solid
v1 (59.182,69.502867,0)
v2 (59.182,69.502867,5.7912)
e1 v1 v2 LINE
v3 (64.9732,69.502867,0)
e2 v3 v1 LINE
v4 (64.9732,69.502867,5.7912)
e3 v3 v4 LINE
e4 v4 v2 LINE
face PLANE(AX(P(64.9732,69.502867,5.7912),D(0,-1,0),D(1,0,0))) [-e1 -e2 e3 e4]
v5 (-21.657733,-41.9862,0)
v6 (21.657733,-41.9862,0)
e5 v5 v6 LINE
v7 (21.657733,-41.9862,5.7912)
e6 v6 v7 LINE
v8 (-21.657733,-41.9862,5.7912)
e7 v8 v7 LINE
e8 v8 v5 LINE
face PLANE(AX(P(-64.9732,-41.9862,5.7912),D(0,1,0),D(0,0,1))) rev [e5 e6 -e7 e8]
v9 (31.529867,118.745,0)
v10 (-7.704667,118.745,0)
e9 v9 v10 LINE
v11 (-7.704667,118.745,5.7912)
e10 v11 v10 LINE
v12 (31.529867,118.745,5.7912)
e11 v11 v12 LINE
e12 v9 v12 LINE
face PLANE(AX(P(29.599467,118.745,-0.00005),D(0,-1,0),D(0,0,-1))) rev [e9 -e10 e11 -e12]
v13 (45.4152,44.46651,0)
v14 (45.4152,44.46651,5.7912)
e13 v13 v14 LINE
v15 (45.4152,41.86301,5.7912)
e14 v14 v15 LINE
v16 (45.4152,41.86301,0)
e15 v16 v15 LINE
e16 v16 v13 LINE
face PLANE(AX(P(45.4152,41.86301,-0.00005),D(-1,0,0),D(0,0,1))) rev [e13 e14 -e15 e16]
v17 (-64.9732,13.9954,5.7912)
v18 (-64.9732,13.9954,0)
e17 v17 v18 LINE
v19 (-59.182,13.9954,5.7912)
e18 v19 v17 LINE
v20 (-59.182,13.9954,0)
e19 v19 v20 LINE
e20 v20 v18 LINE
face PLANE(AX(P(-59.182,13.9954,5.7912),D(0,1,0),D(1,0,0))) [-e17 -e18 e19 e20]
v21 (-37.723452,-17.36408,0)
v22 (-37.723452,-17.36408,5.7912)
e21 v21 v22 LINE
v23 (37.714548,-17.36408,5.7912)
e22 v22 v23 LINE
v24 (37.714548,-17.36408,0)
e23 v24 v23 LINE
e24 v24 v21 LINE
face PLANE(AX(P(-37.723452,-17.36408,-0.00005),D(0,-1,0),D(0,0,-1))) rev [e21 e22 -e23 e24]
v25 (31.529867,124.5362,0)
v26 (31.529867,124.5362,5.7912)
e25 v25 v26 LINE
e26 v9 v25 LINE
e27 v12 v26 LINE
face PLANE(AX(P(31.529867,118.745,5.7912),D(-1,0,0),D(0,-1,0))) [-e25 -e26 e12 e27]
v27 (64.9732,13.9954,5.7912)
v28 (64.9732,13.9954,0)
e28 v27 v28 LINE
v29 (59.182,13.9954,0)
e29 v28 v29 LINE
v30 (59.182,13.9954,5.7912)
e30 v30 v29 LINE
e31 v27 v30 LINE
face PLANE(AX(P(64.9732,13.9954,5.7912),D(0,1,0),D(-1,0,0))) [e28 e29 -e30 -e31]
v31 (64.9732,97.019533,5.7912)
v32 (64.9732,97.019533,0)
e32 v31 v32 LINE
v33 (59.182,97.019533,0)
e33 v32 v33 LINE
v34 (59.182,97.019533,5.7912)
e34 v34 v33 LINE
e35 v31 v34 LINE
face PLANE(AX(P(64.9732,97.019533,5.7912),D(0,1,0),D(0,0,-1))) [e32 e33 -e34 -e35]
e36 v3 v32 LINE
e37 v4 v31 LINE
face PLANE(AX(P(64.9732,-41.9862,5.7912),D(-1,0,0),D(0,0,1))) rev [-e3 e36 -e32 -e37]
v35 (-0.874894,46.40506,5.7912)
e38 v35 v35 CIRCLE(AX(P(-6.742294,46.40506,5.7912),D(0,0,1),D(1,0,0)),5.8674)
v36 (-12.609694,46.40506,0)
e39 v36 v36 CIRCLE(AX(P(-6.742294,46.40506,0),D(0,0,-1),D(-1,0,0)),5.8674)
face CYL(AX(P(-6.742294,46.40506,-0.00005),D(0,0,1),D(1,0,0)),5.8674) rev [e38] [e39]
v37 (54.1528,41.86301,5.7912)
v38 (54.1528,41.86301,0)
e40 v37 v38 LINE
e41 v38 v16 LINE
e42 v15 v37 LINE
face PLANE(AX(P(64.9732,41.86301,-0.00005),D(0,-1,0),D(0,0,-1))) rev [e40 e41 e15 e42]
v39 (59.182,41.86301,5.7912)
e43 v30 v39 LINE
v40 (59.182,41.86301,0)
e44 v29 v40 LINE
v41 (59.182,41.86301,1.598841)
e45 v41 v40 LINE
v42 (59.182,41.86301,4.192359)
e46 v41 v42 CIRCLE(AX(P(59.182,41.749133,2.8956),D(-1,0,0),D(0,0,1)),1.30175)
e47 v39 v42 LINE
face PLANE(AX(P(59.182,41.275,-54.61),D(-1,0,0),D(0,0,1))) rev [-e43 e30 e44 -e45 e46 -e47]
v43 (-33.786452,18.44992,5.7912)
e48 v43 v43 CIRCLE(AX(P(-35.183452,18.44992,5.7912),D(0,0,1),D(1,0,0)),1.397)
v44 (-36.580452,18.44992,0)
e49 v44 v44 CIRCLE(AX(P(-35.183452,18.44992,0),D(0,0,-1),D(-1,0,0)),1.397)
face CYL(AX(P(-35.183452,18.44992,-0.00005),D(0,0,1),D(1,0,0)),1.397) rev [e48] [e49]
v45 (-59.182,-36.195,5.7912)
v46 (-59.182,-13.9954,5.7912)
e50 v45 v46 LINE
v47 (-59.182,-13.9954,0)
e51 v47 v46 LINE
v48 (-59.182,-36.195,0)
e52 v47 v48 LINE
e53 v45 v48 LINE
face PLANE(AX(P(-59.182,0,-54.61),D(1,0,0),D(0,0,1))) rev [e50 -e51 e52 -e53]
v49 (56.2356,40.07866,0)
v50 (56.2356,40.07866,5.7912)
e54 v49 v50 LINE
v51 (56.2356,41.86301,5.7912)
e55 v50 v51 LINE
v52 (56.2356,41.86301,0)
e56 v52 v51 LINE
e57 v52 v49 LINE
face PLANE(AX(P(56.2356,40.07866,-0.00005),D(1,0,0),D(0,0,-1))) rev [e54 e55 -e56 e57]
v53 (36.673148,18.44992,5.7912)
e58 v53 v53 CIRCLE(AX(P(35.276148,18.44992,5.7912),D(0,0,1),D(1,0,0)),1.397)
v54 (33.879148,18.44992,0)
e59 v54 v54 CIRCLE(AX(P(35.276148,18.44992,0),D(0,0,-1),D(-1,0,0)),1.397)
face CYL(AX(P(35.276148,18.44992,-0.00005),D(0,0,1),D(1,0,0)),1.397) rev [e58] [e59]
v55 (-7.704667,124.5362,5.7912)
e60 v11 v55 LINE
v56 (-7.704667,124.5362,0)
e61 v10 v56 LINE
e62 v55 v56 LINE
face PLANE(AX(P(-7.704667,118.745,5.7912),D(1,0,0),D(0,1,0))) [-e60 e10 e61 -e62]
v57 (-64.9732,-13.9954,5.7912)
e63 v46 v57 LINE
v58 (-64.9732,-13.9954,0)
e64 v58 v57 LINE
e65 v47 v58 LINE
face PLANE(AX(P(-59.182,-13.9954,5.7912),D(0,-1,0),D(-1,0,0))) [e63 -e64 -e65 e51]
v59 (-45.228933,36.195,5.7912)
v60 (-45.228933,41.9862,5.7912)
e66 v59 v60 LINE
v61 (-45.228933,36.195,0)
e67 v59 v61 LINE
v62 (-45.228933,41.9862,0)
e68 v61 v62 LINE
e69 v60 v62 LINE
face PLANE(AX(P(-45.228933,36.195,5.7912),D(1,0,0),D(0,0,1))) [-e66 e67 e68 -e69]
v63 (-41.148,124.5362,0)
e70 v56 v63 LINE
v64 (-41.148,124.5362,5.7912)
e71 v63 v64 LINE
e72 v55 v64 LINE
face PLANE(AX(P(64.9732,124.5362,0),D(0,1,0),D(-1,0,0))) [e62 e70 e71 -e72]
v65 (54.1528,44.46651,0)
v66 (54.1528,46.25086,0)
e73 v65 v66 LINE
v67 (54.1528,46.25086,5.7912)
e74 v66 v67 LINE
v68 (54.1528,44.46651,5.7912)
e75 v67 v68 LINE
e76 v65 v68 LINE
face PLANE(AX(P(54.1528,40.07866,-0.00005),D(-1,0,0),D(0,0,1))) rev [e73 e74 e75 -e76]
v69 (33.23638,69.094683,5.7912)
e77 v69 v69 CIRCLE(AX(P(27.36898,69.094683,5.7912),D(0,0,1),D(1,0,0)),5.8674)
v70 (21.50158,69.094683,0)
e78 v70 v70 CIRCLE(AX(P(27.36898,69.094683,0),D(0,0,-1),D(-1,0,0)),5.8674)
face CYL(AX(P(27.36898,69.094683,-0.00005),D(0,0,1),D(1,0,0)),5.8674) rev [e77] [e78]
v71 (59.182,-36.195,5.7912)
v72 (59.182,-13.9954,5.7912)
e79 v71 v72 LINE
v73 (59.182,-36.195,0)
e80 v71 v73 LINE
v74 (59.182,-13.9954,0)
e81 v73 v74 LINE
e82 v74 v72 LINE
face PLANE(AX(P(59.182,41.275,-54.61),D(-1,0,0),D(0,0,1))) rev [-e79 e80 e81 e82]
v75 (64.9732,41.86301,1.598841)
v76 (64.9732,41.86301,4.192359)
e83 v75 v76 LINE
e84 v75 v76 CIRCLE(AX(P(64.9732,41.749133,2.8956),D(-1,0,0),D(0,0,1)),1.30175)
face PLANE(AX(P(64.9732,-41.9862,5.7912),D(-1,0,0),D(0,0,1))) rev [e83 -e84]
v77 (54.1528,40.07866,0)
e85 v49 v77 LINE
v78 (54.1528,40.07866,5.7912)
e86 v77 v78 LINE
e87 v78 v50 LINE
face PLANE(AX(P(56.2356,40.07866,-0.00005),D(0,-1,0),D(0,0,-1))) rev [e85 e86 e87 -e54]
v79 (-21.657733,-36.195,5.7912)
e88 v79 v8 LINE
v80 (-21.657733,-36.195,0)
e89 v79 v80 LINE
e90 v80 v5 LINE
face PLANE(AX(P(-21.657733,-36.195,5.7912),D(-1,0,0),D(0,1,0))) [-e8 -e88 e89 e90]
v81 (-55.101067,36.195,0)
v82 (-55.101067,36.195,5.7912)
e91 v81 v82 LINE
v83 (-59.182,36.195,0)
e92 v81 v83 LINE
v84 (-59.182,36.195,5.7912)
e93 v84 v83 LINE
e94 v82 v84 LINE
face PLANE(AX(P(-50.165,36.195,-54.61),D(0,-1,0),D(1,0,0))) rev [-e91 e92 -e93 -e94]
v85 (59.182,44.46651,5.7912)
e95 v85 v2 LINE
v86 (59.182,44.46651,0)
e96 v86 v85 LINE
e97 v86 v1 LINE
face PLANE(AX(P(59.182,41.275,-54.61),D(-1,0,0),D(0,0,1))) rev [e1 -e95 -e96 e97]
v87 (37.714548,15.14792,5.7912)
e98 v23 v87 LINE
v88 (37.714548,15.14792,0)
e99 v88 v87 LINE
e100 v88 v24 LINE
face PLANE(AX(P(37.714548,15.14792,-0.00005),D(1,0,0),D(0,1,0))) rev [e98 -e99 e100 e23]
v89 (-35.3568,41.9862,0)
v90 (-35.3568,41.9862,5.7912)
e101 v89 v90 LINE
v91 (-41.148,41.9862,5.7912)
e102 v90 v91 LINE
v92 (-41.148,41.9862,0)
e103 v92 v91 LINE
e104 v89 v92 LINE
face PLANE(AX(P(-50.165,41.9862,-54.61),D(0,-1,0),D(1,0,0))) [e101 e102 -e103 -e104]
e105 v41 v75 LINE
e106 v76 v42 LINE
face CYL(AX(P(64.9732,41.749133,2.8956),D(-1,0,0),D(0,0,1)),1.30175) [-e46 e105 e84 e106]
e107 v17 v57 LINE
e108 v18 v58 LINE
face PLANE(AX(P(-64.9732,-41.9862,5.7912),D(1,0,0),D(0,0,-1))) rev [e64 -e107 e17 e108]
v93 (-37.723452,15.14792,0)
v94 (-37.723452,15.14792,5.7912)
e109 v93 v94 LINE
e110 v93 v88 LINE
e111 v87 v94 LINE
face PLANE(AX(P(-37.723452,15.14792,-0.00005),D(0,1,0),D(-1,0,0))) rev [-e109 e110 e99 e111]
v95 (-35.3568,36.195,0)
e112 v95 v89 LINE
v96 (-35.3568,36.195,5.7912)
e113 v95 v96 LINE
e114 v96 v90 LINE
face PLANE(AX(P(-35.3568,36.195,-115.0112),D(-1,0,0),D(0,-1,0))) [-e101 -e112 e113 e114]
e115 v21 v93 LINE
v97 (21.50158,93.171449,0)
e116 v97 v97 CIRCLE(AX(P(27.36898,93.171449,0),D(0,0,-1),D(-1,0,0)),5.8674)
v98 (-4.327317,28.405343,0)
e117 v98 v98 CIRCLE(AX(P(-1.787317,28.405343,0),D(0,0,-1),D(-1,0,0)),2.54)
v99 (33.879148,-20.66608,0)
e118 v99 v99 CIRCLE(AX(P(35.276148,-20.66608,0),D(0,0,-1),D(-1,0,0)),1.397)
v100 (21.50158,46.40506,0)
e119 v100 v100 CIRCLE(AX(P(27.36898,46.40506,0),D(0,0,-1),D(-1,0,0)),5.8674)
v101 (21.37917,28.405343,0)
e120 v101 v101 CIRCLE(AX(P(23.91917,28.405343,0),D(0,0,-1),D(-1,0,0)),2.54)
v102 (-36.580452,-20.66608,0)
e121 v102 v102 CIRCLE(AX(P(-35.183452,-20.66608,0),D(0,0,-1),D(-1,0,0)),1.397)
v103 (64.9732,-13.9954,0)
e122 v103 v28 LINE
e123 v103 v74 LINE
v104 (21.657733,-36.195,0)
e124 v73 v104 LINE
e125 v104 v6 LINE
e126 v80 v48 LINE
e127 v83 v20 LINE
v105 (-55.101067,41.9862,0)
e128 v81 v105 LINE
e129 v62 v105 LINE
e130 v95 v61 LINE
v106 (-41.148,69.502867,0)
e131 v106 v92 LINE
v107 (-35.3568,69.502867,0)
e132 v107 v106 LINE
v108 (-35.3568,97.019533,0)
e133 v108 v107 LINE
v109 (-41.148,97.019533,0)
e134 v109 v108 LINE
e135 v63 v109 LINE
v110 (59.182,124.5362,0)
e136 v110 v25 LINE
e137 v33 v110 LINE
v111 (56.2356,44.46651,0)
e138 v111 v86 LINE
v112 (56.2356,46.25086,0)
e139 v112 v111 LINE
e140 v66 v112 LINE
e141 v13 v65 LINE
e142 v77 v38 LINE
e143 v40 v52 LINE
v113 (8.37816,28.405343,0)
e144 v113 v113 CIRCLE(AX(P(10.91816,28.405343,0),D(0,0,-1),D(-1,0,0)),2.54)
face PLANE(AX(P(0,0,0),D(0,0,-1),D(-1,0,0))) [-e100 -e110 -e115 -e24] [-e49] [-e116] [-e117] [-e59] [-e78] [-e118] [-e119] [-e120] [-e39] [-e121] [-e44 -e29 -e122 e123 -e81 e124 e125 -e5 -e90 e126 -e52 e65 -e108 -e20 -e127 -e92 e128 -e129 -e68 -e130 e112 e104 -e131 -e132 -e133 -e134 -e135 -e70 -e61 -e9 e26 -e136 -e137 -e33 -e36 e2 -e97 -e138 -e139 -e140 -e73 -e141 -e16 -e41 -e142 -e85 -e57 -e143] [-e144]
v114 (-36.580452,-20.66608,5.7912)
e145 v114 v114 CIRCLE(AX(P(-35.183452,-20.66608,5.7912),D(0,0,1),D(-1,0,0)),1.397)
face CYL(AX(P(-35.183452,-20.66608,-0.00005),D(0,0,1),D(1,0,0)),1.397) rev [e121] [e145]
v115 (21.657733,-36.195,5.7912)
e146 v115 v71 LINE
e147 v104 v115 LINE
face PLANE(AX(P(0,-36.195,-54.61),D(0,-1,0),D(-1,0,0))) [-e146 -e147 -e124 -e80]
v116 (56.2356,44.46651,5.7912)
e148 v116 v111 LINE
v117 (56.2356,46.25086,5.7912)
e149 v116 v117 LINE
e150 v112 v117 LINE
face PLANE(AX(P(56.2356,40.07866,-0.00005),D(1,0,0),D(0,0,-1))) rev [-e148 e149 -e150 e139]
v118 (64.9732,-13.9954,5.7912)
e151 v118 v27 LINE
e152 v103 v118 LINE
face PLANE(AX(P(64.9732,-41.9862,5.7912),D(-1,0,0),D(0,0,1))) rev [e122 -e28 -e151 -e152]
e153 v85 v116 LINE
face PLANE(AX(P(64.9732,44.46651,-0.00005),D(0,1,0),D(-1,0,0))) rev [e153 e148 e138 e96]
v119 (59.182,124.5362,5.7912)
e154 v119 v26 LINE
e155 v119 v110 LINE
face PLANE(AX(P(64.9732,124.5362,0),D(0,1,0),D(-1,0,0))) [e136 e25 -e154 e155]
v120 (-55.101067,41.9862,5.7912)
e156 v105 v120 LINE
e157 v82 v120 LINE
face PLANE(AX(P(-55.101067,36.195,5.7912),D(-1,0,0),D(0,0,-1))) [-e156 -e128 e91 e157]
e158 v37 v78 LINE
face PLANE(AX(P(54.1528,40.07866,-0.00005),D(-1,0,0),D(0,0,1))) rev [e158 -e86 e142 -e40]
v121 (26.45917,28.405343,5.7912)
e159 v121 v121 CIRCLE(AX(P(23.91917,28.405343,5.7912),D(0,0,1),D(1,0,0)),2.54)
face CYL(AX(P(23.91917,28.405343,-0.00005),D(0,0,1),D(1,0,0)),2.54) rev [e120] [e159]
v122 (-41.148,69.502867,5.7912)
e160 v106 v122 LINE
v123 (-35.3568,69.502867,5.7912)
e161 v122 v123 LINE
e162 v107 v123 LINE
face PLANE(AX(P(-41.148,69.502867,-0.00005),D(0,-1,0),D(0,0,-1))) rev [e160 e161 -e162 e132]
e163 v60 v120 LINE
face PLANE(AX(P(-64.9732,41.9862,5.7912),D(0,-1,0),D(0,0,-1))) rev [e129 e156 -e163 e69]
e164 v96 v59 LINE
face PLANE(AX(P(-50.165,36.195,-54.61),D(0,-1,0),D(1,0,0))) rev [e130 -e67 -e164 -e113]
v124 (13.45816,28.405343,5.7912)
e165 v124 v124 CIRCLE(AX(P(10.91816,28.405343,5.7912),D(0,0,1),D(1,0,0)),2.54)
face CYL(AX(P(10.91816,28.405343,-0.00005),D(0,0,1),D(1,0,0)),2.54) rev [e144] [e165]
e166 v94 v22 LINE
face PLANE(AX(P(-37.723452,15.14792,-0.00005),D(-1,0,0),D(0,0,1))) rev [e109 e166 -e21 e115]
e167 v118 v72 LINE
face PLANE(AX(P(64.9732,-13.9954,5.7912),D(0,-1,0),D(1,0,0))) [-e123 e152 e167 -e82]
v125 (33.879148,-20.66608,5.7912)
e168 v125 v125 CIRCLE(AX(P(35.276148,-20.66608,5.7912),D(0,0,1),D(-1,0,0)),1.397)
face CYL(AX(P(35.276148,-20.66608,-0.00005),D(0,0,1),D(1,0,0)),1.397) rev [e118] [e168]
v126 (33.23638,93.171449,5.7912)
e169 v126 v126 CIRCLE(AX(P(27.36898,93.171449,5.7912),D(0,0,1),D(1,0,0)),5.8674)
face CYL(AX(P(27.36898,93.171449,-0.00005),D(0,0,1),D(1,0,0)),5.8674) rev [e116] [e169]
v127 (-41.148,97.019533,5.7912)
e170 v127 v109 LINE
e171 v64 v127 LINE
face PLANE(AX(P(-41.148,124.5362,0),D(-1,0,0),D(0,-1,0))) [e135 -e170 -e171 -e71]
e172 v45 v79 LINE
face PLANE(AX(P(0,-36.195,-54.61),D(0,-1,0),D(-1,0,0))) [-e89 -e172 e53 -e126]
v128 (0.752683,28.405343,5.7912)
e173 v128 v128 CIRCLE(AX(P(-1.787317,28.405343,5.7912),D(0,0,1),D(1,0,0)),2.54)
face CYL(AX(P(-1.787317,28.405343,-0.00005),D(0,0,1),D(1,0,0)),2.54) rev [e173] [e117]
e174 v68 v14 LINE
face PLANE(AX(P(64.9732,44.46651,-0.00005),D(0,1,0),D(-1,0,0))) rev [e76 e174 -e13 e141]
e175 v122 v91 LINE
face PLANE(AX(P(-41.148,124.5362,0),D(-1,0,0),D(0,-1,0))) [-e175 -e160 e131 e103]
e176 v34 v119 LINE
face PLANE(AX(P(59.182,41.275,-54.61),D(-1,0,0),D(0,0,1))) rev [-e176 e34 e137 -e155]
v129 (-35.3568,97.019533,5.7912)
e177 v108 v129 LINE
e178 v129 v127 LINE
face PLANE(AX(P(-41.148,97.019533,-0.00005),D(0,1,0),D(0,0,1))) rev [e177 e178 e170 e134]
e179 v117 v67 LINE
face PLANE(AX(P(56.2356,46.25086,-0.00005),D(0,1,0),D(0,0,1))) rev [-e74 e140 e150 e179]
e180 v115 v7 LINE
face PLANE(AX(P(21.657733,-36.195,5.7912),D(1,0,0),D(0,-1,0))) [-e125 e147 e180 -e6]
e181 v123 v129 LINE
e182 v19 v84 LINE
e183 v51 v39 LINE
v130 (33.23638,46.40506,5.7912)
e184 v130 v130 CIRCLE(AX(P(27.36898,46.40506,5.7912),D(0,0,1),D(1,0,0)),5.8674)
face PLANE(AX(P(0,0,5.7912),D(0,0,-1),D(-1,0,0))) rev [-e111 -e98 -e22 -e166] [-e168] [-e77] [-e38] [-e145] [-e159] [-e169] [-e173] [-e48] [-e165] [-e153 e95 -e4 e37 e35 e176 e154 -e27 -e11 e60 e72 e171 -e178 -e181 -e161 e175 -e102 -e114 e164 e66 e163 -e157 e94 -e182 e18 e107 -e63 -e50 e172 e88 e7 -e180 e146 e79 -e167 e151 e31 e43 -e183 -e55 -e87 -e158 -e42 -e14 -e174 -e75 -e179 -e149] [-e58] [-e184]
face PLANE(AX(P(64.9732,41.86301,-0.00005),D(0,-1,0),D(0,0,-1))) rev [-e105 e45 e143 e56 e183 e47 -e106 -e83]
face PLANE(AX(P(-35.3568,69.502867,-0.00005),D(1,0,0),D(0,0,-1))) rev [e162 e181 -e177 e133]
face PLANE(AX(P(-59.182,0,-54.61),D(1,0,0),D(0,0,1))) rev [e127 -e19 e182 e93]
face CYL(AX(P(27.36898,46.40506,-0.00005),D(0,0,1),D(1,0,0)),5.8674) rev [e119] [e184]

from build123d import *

# Parameters (mm, degrees)
SKETCH1_W           = 129.9464
SKETCH1_H           = 83.9724
BOSS_EXTRUDE1_DEPTH = 5.7912
SKETCH7_W           = 106.1212
SKETCH7_H           = 82.55
BOSS_EXTRUDE2_DEPTH = 5.7912
SKETCH12_W          = 5.7912
SKETCH12_H          = 27.516666666
CUT_EXTRUDE9_DEPTH  = 141.585631649
SKETCH15_W          = 35.373733334
SKETCH15_H          = 5.7912
CUT_EXTRUDE12_DEPTH = 141.585631649
SKETCH18_R          = 1.397
SKETCH18_W          = 75.438
SKETCH18_H          = 32.512
CUT_EXTRUDE15_DEPTH = 141.585631649
SKETCH19_W          = 19.558
SKETCH19_H          = 2.6035
CUT_EXTRUDE16_DEPTH = 141.585631649
SKETCH20_W          = 2.0828
SKETCH20_H          = 6.1722
CUT_EXTRUDE17_DEPTH = 141.585631649
CAVITY1_START       = 59.182
CAVITY1_OUTLINE_W   = 27.9908
CAVITY1_OUTLINE_H   = 5.7912
CAVITY1_OUTLINE_W_2 = 25.036356667
CAVITY1_OUTLINE_W_3 = 27.516666667
CAVITY1_DEPTH       = 5.7912
CAVITY1_START_2     = -64.9732
CAVITY1_2_OUTLINE_W = 27.9908
CAVITY1_2_OUTLINE_H = 5.7912
CAVITY1_2_DEPTH     = 5.7912
CAVITY1_START_3     = -59.182
CAVITY1_3_OUTLINE_W = 5.7912
CAVITY1_3_OUTLINE_H = 5.7912
CAVITY1_3_DEPTH     = 37.524266667
CAVITY1_START_4     = 21.657733333
CAVITY1_4_OUTLINE_W = 5.7912
CAVITY1_4_OUTLINE_H = 5.7912
CAVITY1_4_DEPTH     = 37.524266667
CAVITY1_START_5     = -45.228933333
CAVITY1_5_OUTLINE_W = 5.7912
CAVITY1_5_OUTLINE_H = 5.7912
CAVITY1_5_DEPTH     = 9.872133333
CAVITY1_6_OUTLINE_W = 5.7912
CAVITY1_6_OUTLINE_H = 5.7912
CAVITY1_6_DEPTH     = 4.080933333
CAVITY1_START_6     = -7.704666667
CAVITY1_7_OUTLINE_W = 5.7912
CAVITY1_7_OUTLINE_H = 5.7912
CAVITY1_7_DEPTH     = 39.234533334
SKETCH21_R          = 2.54
CUT_EXTRUDE18_DEPTH = 141.585631649
SKETCH22_R          = 5.8674
SKETCH22_W          = 10.922
SKETCH22_H          = 12.7
CUT_EXTRUDE19_DEPTH = 141.585631649


# Read off the part's stored shape, not the designer's step: Cavity1
with BuildPart() as part:
    # Sketch1 → Boss-Extrude1 (new body)
    with BuildSketch(Plane.XY):
        Rectangle(SKETCH1_W, SKETCH1_H)
    extrude(amount=BOSS_EXTRUDE1_DEPTH)

    # Sketch7 → Boss-Extrude2 (add)
    with BuildSketch(Plane.XY.offset(5.7912)):
        with Locations((11.9126, 83.2612)):
            Rectangle(SKETCH7_W, SKETCH7_H)
    extrude(amount=-BOSS_EXTRUDE2_DEPTH)

    # Sketch12 → Cut-Extrude9 (cut, through all)
    with BuildSketch(Plane.XY.offset(5.7912)):
        with Locations((-38.2524, 83.2612)):
            Rectangle(SKETCH12_W, SKETCH12_H)
    extrude(amount=-CUT_EXTRUDE9_DEPTH, mode=Mode.SUBTRACT)

    # Sketch15 → Cut-Extrude12 (cut, through all)
    with BuildSketch(Plane.XY.offset(5.7912)):
        with Locations((11.9126, 121.6406)):
            Rectangle(SKETCH15_W, SKETCH15_H)
    extrude(amount=-CUT_EXTRUDE12_DEPTH, mode=Mode.SUBTRACT)

    # Sketch18 → Cut-Extrude15 (cut, through all)
    with BuildSketch(Plane.XY.offset(5.7912)):
        with Locations((-35.183452425, 18.449919855)):
            Circle(SKETCH18_R)
        with Locations((35.276147575, 18.449919855)):
            Circle(SKETCH18_R)
        with Locations(Location((35.276147575, -20.666080145, 0), (0, 0, 180))):
            Circle(SKETCH18_R)
        with Locations(Location((-35.183452425, -20.666080145, 0), (0, 0, 180))):
            Circle(SKETCH18_R)
        with Locations((-0.004452425, -1.108080145)):
            Rectangle(SKETCH18_W, SKETCH18_H)
    extrude(amount=-CUT_EXTRUDE15_DEPTH, mode=Mode.SUBTRACT)

    # Sketch19 → Cut-Extrude16 (cut, through all)
    with BuildSketch(Plane.XY.offset(5.7912)):
        with Locations((55.1942, 43.16476)):
            Rectangle(SKETCH19_W, SKETCH19_H)
    extrude(amount=-CUT_EXTRUDE16_DEPTH, mode=Mode.SUBTRACT)

    # Sketch20 → Cut-Extrude17 (cut, through all)
    with BuildSketch(Plane.XY.offset(5.7912)):
        with Locations((55.1942, 43.16476)):
            Rectangle(SKETCH20_W, SKETCH20_H)
    extrude(amount=-CUT_EXTRUDE17_DEPTH, mode=Mode.SUBTRACT)

    # Cavity1 outline → Cavity1 (cut)
    with BuildSketch(Plane.YZ.offset(CAVITY1_START)):
        with Locations((-27.9908, 2.8956)):
            Rectangle(CAVITY1_OUTLINE_W, CAVITY1_OUTLINE_H)
        with BuildLine():
            Line((13.9954, 5.7912), (13.9954, 0))
            Line((13.9954, 0), (41.86301, 0))
            Line((41.86301, 0), (41.86301, 1.598840513))
            ThreePointArc((41.86301, 1.598840513), (40.447383333, 2.8956), (41.86301, 4.192359487))
            Line((41.86301, 4.192359487), (41.86301, 5.7912))
            Line((41.86301, 5.7912), (13.9954, 5.7912))
        make_face()
        with Locations((56.984688334, 2.8956)):
            Rectangle(CAVITY1_OUTLINE_W_2, CAVITY1_OUTLINE_H)
        with Locations((110.777866667, 2.8956)):
            Rectangle(CAVITY1_OUTLINE_W_3, CAVITY1_OUTLINE_H)
    extrude(amount=CAVITY1_DEPTH, mode=Mode.SUBTRACT)

    # Cavity1 2 outline → Cavity1 2 (cut)
    with BuildSketch(Plane.YZ.offset(CAVITY1_START_2)):
        with Locations((-27.9908, 2.8956)):
            Rectangle(CAVITY1_2_OUTLINE_W, CAVITY1_2_OUTLINE_H)
        with Locations((27.9908, 2.8956)):
            Rectangle(CAVITY1_2_OUTLINE_W, CAVITY1_2_OUTLINE_H)
    extrude(amount=CAVITY1_2_DEPTH, mode=Mode.SUBTRACT)

    # Cavity1 3 outline → Cavity1 3 (cut)
    with BuildSketch(Plane.YZ.offset(CAVITY1_START_3)):
        with Locations((-39.0906, 2.8956)):
            Rectangle(CAVITY1_3_OUTLINE_W, CAVITY1_3_OUTLINE_H)
    extrude(amount=CAVITY1_3_DEPTH, mode=Mode.SUBTRACT)

    # Cavity1 4 outline → Cavity1 4 (cut)
    with BuildSketch(Plane.YZ.offset(CAVITY1_START_4)):
        with Locations((-39.0906, 2.8956)):
            Rectangle(CAVITY1_4_OUTLINE_W, CAVITY1_4_OUTLINE_H)
    extrude(amount=CAVITY1_4_DEPTH, mode=Mode.SUBTRACT)

    # Cavity1 5 outline → Cavity1 5 (cut)
    with BuildSketch(Plane.YZ.offset(CAVITY1_START_5)):
        with Locations((39.0906, 2.8956)):
            Rectangle(CAVITY1_5_OUTLINE_W, CAVITY1_5_OUTLINE_H)
    extrude(amount=CAVITY1_5_DEPTH, mode=Mode.SUBTRACT)

    # Cavity1 6 outline → Cavity1 6 (cut)
    with BuildSketch(Plane.YZ.offset(CAVITY1_START_3)):
        with Locations((39.0906, 2.8956)):
            Rectangle(CAVITY1_6_OUTLINE_W, CAVITY1_6_OUTLINE_H)
    extrude(amount=CAVITY1_6_DEPTH, mode=Mode.SUBTRACT)

    # Cavity1 7 outline → Cavity1 7 (cut)
    with BuildSketch(Plane.YZ.offset(CAVITY1_START_6)):
        with Locations((121.6406, 2.8956)):
            Rectangle(CAVITY1_7_OUTLINE_W, CAVITY1_7_OUTLINE_H)
    extrude(amount=CAVITY1_7_DEPTH, mode=Mode.SUBTRACT)

    # Sketch21 → Cut-Extrude18 (cut, through all)
    with BuildSketch(Plane.XY.offset(5.7912)):
        with Locations((23.919169713, 28.405342819)):
            Circle(SKETCH21_R)
        with Locations((10.918159713, 28.405342819)):
            Circle(SKETCH21_R)
        with Locations((-1.787317277, 28.405342819)):
            Circle(SKETCH21_R)
    extrude(amount=-CUT_EXTRUDE18_DEPTH, mode=Mode.SUBTRACT)

    # Sketch22 → Cut-Extrude19 (cut, through all)
    with BuildSketch(Plane.XY.offset(5.7912)):
        with Locations((27.368980229, 46.405060213)):
            Circle(SKETCH22_R)
        with Locations((-6.74229364, 46.405060213)):
            Circle(SKETCH22_R)
        with Locations((27.368980229, 69.094682683)):
            Circle(SKETCH22_R)
        with Locations((27.368980229, 93.171449402)):
            Circle(SKETCH22_R)
        with Locations((995.334727121, -604.282322998)):
            Rectangle(SKETCH22_W, SKETCH22_H)
        with Locations((995.334727121, -676.824722998)):
            Rectangle(SKETCH22_W, SKETCH22_H)
        with Locations((995.334727121, -628.971122998)):
            Rectangle(SKETCH22_W, SKETCH22_H)
        with Locations((995.334727121, -653.117356371)):
            Rectangle(SKETCH22_W, SKETCH22_H)
    extrude(amount=-CUT_EXTRUDE19_DEPTH, mode=Mode.SUBTRACT)


solid = part.part
